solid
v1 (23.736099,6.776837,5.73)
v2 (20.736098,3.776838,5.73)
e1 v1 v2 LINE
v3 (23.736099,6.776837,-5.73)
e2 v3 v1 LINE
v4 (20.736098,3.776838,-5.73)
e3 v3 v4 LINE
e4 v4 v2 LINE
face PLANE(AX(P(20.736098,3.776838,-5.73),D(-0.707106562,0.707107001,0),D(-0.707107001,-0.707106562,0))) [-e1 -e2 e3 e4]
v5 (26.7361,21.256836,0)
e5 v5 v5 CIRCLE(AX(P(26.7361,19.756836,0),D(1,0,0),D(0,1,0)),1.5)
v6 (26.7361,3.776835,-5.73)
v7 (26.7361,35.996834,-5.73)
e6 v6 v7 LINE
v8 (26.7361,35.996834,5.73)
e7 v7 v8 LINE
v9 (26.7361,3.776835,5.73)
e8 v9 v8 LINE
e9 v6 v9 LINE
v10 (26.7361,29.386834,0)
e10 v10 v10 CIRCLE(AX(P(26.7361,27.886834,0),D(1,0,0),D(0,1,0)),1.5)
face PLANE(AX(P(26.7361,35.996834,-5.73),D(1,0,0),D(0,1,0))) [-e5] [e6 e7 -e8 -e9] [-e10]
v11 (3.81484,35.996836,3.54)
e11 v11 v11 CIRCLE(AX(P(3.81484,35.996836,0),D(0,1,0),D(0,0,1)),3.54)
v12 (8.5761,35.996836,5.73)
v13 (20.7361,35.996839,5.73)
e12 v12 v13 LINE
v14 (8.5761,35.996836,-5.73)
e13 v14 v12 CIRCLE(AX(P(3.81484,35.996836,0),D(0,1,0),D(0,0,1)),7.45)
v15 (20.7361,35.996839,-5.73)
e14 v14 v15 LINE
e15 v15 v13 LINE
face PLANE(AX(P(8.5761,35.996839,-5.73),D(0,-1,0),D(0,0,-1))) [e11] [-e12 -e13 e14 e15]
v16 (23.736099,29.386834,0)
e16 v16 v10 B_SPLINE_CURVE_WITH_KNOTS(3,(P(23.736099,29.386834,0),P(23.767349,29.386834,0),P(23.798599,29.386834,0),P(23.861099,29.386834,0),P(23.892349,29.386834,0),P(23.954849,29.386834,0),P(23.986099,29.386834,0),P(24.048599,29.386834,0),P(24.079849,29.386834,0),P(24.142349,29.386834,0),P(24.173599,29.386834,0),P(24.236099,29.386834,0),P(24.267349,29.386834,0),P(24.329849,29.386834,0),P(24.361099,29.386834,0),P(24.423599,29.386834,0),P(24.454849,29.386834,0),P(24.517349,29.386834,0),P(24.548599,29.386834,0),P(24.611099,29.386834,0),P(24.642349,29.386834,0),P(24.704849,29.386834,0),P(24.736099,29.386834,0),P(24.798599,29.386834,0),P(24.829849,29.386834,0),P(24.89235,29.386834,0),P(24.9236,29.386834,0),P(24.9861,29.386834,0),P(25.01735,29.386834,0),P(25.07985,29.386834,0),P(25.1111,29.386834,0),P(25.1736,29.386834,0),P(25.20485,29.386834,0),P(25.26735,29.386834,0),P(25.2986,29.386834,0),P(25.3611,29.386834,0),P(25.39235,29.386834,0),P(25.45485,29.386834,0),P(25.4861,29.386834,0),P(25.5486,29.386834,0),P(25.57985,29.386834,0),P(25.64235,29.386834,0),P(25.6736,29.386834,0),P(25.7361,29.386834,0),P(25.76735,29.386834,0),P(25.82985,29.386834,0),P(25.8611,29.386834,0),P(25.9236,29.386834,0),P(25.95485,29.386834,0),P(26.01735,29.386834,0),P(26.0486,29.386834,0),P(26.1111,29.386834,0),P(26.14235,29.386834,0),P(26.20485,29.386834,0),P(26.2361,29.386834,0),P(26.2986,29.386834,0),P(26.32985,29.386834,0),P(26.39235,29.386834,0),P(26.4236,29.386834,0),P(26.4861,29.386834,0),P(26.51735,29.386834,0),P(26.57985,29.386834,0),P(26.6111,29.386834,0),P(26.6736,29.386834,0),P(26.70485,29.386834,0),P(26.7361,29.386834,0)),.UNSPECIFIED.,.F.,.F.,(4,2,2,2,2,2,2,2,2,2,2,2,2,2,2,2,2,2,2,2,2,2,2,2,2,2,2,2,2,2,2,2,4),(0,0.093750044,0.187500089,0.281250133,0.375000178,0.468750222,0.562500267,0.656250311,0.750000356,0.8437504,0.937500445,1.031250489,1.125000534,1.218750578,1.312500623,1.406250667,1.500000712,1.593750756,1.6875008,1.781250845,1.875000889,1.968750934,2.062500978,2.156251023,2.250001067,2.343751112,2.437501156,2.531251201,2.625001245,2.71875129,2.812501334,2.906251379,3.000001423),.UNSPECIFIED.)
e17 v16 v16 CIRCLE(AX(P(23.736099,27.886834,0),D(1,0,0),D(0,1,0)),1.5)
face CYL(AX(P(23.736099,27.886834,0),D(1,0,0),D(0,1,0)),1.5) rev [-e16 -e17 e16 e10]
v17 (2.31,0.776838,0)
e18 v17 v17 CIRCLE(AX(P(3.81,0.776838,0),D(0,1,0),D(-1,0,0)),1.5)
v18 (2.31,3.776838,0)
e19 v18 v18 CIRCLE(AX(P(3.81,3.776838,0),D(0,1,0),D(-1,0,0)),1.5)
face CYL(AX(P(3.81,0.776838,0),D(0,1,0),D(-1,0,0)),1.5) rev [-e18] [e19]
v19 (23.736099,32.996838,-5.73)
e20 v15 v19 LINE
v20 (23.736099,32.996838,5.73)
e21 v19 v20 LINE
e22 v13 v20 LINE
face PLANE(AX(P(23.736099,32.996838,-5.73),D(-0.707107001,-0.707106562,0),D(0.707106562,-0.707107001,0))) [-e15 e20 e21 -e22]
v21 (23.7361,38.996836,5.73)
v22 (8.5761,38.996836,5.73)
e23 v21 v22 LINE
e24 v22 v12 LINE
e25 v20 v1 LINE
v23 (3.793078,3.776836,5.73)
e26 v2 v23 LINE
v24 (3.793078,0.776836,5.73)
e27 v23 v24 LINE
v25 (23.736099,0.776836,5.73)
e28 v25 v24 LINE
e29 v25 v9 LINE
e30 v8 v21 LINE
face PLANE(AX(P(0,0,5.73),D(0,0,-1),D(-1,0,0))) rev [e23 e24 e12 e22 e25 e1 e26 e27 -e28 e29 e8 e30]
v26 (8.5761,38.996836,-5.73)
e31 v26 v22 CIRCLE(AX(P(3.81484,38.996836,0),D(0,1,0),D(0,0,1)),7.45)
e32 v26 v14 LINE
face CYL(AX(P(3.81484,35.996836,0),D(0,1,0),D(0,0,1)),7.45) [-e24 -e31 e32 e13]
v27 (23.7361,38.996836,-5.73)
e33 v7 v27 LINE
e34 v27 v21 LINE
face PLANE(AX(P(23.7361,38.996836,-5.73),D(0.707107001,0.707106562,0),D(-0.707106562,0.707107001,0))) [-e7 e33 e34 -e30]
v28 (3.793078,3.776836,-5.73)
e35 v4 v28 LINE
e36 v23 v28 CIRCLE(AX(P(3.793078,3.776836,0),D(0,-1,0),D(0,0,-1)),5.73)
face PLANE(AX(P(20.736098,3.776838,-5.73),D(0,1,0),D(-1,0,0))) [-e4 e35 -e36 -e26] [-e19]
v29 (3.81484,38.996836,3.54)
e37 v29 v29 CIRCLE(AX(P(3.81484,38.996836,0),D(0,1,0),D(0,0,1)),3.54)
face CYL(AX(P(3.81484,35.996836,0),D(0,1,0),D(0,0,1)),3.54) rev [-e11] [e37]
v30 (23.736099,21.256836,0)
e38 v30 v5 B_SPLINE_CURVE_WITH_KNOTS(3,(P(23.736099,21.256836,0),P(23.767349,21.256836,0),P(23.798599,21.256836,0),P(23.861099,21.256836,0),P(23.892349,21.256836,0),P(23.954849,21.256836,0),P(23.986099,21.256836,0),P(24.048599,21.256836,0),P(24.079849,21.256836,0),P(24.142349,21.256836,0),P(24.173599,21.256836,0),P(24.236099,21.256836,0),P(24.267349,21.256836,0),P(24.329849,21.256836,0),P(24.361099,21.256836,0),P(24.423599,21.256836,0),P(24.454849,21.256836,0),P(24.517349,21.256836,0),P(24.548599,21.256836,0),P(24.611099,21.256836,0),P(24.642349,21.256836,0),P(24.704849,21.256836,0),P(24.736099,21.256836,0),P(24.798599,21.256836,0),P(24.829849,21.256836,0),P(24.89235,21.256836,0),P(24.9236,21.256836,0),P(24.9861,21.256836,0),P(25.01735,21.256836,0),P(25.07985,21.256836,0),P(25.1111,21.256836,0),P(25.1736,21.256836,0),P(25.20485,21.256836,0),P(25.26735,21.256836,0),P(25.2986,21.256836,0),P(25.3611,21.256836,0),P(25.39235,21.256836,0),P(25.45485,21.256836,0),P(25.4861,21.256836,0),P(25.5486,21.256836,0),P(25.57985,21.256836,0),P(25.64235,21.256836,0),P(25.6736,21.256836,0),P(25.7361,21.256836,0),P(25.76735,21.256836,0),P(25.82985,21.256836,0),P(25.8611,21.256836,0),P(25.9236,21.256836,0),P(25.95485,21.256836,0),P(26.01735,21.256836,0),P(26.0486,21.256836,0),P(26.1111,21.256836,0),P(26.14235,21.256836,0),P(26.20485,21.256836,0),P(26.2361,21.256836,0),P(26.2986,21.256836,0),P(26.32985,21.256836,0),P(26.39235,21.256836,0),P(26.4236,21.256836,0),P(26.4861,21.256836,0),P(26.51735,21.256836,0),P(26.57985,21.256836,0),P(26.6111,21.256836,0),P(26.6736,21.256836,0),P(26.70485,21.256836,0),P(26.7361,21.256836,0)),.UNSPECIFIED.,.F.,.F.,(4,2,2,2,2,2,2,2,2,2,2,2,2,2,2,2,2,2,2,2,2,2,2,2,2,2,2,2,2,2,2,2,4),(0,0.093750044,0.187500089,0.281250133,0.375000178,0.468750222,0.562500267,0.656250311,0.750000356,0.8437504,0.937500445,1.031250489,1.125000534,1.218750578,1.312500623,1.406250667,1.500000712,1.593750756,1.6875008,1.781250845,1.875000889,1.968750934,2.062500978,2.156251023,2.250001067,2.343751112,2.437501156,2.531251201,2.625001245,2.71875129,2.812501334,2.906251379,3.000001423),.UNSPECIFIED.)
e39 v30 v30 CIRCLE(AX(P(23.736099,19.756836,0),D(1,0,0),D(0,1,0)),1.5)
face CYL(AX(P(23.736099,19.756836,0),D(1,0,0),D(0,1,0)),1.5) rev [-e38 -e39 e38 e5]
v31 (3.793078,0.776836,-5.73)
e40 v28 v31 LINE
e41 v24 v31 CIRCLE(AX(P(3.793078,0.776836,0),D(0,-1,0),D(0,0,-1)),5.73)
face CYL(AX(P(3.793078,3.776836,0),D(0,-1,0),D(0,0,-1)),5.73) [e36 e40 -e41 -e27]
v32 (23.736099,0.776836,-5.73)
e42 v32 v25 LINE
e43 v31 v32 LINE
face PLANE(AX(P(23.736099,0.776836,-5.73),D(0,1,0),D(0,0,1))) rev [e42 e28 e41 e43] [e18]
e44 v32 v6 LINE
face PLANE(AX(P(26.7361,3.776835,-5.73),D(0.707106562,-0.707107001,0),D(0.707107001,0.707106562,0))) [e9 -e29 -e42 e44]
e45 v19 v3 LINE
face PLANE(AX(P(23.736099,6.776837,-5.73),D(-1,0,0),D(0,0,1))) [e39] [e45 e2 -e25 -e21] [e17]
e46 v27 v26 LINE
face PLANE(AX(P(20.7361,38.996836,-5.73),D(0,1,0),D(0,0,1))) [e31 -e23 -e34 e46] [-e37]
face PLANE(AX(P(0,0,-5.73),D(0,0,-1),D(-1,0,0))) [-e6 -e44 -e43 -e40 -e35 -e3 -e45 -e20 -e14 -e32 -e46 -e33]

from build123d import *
from OCP.BRepAlgoAPI import BRepAlgoAPI_Cut
from OCP.TopTools import TopTools_ListOfShape

# Parameters (mm, degrees)
BOSS_EXTRUDE1_DEPTH      = 5.73
BOSS_EXTRUDE1_DEPTH_BACK = 5.73
BOSS_EXTRUDE5_DEPTH      = 11.46
BOSS_EXTRUDE8_DEPTH      = 11.46
BOSS_EXTRUDE9_DEPTH      = 3
SKETCH11_R               = 3.54
CUT_EXTRUDE1_DEPTH       = 3
BOSS_EXTRUDE10_DEPTH     = 3
SKETCH13_R               = 1.5
CUT_EXTRUDE2_DEPTH       = 3
CUT_EXTRUDE3_START       = -3.000002
SKETCH15_R               = 1.5
CUT_EXTRUDE3_DEPTH       = 3.000002


with BuildPart() as part:
    # Sketch1 → Boss-Extrude1 (new, two sides: drawn at the far end of the back side and taken through both)
    with BuildSketch(Plane.XY.offset(-BOSS_EXTRUDE1_DEPTH_BACK)):
        Polygon((23.736099909, 38.996836219), (26.736100401, 35.996833865), (26.736100401, 3.776835326), (23.736098978, 0.776835766), (20.736098486, 3.77683812), (23.736098978, 6.776836749), (23.736098978, 32.99683803), (20.736100349, 35.996838521), align=None)
    extrude(amount=BOSS_EXTRUDE1_DEPTH + BOSS_EXTRUDE1_DEPTH_BACK)

    # Sketch6 → Boss-Extrude5 (add)
    with BuildSketch(Plane.XY.offset(5.73)):
        Polygon((20.736098486, 3.77683812), (8.576098486, 3.77683812), (8.576098486, 0.776835766), (20.736098486, 0.776835766), (23.736098978, 0.776835766), align=None)
    extrude(amount=-BOSS_EXTRUDE5_DEPTH)

    # Sketch8 → Boss-Extrude8 (add)
    with BuildSketch(Plane.XY.offset(5.73)):
        Polygon((20.736100349, 38.996836219), (23.736099909, 38.996836219), (20.736100349, 35.996838521), (8.576100349, 35.996838521), (8.576100349, 38.996836219), align=None)
    extrude(amount=-BOSS_EXTRUDE8_DEPTH)

    # Sketch9 → Boss-Extrude9 (add)
    with BuildSketch(Plane(origin=(0, 38.996836219, 0), x_dir=(1, 0, 0), z_dir=(0, 1, 0))):
        with BuildLine():
            Line((8.576100349, 5.73), (8.576100349, -5.73))
            ThreePointArc((8.576100349, -5.73), (-3.635159989, 0), (8.576100349, 5.73))
        make_face()
    extrude(amount=-BOSS_EXTRUDE9_DEPTH)

    # Sketch11 → Cut-Extrude1 (cut)
    with BuildSketch(Plane(origin=(0, 38.996836219, 0), x_dir=(1, 0, 0), z_dir=(0, 1, 0))):
        with Locations(Location((3.814840011, 0, 0), (0, 0, 270))):
            Circle(SKETCH11_R)
    extrude(amount=-CUT_EXTRUDE1_DEPTH, mode=Mode.SUBTRACT)

    # Sketch12 → Boss-Extrude10 (add)
    with BuildSketch(Plane(origin=(0, 0.776835766, 0), x_dir=(-1, 0, 0), z_dir=(0, -1, 0))):
        with BuildLine():
            Line((-8.576098486, 5.73), (-3.793078174, 5.73))
            ThreePointArc((-3.793078174, 5.73), (1.936921826, 0), (-3.793078174, -5.73))
            Line((-3.793078174, -5.73), (-8.576098486, -5.73))
            Line((-8.576098486, -5.73), (-8.576098486, 5.73))
        make_face()
    extrude(amount=-BOSS_EXTRUDE10_DEPTH)


with BuildPart() as cut_extrude2_tool:
    # Sketch13 → Cut-Extrude2 (new body)
    with BuildSketch(Plane(origin=(0, 3.77683812, 0), x_dir=(1, 0, 0), z_dir=(0, 1, 0))):
        with Locations(Location((3.81, 0, 0), (0, 0, 180))):
            Circle(SKETCH13_R)
    extrude(amount=-CUT_EXTRUDE2_DEPTH)


with BuildPart() as part_1:
    add(part.part)

    # Cut-Extrude2: cut by cut_extrude2_tool, with a tolerance
    cut_extrude2_stock = TopTools_ListOfShape()
    cut_extrude2_stock.Append(part_1.part.wrapped)
    cut_extrude2_tools = TopTools_ListOfShape()
    cut_extrude2_tools.Append(cut_extrude2_tool.part.wrapped)
    cut_extrude2_cut = BRepAlgoAPI_Cut()
    cut_extrude2_cut.SetArguments(cut_extrude2_stock)
    cut_extrude2_cut.SetTools(cut_extrude2_tools)
    cut_extrude2_cut.SetFuzzyValue(0.00001)
    cut_extrude2_cut.Build()
    add(Compound.cast(cut_extrude2_cut.Shape()).solids(), mode=Mode.REPLACE)

    # Sketch15 → Cut-Extrude3 (cut)
    with BuildSketch(Plane(origin=(26.736100401, 0, 0), x_dir=(0, 0, -1), z_dir=(1, 0, 0)).offset(CUT_EXTRUDE3_START)):
        with Locations(Location((0, 27.886833865, 0), (0, 0, 90))):
            Circle(SKETCH15_R)
        with Locations(Location((0, 19.756835766, 0), (0, 0, 90))):
            Circle(SKETCH15_R)
    extrude(amount=CUT_EXTRUDE3_DEPTH, mode=Mode.SUBTRACT)


solid = part_1.part
